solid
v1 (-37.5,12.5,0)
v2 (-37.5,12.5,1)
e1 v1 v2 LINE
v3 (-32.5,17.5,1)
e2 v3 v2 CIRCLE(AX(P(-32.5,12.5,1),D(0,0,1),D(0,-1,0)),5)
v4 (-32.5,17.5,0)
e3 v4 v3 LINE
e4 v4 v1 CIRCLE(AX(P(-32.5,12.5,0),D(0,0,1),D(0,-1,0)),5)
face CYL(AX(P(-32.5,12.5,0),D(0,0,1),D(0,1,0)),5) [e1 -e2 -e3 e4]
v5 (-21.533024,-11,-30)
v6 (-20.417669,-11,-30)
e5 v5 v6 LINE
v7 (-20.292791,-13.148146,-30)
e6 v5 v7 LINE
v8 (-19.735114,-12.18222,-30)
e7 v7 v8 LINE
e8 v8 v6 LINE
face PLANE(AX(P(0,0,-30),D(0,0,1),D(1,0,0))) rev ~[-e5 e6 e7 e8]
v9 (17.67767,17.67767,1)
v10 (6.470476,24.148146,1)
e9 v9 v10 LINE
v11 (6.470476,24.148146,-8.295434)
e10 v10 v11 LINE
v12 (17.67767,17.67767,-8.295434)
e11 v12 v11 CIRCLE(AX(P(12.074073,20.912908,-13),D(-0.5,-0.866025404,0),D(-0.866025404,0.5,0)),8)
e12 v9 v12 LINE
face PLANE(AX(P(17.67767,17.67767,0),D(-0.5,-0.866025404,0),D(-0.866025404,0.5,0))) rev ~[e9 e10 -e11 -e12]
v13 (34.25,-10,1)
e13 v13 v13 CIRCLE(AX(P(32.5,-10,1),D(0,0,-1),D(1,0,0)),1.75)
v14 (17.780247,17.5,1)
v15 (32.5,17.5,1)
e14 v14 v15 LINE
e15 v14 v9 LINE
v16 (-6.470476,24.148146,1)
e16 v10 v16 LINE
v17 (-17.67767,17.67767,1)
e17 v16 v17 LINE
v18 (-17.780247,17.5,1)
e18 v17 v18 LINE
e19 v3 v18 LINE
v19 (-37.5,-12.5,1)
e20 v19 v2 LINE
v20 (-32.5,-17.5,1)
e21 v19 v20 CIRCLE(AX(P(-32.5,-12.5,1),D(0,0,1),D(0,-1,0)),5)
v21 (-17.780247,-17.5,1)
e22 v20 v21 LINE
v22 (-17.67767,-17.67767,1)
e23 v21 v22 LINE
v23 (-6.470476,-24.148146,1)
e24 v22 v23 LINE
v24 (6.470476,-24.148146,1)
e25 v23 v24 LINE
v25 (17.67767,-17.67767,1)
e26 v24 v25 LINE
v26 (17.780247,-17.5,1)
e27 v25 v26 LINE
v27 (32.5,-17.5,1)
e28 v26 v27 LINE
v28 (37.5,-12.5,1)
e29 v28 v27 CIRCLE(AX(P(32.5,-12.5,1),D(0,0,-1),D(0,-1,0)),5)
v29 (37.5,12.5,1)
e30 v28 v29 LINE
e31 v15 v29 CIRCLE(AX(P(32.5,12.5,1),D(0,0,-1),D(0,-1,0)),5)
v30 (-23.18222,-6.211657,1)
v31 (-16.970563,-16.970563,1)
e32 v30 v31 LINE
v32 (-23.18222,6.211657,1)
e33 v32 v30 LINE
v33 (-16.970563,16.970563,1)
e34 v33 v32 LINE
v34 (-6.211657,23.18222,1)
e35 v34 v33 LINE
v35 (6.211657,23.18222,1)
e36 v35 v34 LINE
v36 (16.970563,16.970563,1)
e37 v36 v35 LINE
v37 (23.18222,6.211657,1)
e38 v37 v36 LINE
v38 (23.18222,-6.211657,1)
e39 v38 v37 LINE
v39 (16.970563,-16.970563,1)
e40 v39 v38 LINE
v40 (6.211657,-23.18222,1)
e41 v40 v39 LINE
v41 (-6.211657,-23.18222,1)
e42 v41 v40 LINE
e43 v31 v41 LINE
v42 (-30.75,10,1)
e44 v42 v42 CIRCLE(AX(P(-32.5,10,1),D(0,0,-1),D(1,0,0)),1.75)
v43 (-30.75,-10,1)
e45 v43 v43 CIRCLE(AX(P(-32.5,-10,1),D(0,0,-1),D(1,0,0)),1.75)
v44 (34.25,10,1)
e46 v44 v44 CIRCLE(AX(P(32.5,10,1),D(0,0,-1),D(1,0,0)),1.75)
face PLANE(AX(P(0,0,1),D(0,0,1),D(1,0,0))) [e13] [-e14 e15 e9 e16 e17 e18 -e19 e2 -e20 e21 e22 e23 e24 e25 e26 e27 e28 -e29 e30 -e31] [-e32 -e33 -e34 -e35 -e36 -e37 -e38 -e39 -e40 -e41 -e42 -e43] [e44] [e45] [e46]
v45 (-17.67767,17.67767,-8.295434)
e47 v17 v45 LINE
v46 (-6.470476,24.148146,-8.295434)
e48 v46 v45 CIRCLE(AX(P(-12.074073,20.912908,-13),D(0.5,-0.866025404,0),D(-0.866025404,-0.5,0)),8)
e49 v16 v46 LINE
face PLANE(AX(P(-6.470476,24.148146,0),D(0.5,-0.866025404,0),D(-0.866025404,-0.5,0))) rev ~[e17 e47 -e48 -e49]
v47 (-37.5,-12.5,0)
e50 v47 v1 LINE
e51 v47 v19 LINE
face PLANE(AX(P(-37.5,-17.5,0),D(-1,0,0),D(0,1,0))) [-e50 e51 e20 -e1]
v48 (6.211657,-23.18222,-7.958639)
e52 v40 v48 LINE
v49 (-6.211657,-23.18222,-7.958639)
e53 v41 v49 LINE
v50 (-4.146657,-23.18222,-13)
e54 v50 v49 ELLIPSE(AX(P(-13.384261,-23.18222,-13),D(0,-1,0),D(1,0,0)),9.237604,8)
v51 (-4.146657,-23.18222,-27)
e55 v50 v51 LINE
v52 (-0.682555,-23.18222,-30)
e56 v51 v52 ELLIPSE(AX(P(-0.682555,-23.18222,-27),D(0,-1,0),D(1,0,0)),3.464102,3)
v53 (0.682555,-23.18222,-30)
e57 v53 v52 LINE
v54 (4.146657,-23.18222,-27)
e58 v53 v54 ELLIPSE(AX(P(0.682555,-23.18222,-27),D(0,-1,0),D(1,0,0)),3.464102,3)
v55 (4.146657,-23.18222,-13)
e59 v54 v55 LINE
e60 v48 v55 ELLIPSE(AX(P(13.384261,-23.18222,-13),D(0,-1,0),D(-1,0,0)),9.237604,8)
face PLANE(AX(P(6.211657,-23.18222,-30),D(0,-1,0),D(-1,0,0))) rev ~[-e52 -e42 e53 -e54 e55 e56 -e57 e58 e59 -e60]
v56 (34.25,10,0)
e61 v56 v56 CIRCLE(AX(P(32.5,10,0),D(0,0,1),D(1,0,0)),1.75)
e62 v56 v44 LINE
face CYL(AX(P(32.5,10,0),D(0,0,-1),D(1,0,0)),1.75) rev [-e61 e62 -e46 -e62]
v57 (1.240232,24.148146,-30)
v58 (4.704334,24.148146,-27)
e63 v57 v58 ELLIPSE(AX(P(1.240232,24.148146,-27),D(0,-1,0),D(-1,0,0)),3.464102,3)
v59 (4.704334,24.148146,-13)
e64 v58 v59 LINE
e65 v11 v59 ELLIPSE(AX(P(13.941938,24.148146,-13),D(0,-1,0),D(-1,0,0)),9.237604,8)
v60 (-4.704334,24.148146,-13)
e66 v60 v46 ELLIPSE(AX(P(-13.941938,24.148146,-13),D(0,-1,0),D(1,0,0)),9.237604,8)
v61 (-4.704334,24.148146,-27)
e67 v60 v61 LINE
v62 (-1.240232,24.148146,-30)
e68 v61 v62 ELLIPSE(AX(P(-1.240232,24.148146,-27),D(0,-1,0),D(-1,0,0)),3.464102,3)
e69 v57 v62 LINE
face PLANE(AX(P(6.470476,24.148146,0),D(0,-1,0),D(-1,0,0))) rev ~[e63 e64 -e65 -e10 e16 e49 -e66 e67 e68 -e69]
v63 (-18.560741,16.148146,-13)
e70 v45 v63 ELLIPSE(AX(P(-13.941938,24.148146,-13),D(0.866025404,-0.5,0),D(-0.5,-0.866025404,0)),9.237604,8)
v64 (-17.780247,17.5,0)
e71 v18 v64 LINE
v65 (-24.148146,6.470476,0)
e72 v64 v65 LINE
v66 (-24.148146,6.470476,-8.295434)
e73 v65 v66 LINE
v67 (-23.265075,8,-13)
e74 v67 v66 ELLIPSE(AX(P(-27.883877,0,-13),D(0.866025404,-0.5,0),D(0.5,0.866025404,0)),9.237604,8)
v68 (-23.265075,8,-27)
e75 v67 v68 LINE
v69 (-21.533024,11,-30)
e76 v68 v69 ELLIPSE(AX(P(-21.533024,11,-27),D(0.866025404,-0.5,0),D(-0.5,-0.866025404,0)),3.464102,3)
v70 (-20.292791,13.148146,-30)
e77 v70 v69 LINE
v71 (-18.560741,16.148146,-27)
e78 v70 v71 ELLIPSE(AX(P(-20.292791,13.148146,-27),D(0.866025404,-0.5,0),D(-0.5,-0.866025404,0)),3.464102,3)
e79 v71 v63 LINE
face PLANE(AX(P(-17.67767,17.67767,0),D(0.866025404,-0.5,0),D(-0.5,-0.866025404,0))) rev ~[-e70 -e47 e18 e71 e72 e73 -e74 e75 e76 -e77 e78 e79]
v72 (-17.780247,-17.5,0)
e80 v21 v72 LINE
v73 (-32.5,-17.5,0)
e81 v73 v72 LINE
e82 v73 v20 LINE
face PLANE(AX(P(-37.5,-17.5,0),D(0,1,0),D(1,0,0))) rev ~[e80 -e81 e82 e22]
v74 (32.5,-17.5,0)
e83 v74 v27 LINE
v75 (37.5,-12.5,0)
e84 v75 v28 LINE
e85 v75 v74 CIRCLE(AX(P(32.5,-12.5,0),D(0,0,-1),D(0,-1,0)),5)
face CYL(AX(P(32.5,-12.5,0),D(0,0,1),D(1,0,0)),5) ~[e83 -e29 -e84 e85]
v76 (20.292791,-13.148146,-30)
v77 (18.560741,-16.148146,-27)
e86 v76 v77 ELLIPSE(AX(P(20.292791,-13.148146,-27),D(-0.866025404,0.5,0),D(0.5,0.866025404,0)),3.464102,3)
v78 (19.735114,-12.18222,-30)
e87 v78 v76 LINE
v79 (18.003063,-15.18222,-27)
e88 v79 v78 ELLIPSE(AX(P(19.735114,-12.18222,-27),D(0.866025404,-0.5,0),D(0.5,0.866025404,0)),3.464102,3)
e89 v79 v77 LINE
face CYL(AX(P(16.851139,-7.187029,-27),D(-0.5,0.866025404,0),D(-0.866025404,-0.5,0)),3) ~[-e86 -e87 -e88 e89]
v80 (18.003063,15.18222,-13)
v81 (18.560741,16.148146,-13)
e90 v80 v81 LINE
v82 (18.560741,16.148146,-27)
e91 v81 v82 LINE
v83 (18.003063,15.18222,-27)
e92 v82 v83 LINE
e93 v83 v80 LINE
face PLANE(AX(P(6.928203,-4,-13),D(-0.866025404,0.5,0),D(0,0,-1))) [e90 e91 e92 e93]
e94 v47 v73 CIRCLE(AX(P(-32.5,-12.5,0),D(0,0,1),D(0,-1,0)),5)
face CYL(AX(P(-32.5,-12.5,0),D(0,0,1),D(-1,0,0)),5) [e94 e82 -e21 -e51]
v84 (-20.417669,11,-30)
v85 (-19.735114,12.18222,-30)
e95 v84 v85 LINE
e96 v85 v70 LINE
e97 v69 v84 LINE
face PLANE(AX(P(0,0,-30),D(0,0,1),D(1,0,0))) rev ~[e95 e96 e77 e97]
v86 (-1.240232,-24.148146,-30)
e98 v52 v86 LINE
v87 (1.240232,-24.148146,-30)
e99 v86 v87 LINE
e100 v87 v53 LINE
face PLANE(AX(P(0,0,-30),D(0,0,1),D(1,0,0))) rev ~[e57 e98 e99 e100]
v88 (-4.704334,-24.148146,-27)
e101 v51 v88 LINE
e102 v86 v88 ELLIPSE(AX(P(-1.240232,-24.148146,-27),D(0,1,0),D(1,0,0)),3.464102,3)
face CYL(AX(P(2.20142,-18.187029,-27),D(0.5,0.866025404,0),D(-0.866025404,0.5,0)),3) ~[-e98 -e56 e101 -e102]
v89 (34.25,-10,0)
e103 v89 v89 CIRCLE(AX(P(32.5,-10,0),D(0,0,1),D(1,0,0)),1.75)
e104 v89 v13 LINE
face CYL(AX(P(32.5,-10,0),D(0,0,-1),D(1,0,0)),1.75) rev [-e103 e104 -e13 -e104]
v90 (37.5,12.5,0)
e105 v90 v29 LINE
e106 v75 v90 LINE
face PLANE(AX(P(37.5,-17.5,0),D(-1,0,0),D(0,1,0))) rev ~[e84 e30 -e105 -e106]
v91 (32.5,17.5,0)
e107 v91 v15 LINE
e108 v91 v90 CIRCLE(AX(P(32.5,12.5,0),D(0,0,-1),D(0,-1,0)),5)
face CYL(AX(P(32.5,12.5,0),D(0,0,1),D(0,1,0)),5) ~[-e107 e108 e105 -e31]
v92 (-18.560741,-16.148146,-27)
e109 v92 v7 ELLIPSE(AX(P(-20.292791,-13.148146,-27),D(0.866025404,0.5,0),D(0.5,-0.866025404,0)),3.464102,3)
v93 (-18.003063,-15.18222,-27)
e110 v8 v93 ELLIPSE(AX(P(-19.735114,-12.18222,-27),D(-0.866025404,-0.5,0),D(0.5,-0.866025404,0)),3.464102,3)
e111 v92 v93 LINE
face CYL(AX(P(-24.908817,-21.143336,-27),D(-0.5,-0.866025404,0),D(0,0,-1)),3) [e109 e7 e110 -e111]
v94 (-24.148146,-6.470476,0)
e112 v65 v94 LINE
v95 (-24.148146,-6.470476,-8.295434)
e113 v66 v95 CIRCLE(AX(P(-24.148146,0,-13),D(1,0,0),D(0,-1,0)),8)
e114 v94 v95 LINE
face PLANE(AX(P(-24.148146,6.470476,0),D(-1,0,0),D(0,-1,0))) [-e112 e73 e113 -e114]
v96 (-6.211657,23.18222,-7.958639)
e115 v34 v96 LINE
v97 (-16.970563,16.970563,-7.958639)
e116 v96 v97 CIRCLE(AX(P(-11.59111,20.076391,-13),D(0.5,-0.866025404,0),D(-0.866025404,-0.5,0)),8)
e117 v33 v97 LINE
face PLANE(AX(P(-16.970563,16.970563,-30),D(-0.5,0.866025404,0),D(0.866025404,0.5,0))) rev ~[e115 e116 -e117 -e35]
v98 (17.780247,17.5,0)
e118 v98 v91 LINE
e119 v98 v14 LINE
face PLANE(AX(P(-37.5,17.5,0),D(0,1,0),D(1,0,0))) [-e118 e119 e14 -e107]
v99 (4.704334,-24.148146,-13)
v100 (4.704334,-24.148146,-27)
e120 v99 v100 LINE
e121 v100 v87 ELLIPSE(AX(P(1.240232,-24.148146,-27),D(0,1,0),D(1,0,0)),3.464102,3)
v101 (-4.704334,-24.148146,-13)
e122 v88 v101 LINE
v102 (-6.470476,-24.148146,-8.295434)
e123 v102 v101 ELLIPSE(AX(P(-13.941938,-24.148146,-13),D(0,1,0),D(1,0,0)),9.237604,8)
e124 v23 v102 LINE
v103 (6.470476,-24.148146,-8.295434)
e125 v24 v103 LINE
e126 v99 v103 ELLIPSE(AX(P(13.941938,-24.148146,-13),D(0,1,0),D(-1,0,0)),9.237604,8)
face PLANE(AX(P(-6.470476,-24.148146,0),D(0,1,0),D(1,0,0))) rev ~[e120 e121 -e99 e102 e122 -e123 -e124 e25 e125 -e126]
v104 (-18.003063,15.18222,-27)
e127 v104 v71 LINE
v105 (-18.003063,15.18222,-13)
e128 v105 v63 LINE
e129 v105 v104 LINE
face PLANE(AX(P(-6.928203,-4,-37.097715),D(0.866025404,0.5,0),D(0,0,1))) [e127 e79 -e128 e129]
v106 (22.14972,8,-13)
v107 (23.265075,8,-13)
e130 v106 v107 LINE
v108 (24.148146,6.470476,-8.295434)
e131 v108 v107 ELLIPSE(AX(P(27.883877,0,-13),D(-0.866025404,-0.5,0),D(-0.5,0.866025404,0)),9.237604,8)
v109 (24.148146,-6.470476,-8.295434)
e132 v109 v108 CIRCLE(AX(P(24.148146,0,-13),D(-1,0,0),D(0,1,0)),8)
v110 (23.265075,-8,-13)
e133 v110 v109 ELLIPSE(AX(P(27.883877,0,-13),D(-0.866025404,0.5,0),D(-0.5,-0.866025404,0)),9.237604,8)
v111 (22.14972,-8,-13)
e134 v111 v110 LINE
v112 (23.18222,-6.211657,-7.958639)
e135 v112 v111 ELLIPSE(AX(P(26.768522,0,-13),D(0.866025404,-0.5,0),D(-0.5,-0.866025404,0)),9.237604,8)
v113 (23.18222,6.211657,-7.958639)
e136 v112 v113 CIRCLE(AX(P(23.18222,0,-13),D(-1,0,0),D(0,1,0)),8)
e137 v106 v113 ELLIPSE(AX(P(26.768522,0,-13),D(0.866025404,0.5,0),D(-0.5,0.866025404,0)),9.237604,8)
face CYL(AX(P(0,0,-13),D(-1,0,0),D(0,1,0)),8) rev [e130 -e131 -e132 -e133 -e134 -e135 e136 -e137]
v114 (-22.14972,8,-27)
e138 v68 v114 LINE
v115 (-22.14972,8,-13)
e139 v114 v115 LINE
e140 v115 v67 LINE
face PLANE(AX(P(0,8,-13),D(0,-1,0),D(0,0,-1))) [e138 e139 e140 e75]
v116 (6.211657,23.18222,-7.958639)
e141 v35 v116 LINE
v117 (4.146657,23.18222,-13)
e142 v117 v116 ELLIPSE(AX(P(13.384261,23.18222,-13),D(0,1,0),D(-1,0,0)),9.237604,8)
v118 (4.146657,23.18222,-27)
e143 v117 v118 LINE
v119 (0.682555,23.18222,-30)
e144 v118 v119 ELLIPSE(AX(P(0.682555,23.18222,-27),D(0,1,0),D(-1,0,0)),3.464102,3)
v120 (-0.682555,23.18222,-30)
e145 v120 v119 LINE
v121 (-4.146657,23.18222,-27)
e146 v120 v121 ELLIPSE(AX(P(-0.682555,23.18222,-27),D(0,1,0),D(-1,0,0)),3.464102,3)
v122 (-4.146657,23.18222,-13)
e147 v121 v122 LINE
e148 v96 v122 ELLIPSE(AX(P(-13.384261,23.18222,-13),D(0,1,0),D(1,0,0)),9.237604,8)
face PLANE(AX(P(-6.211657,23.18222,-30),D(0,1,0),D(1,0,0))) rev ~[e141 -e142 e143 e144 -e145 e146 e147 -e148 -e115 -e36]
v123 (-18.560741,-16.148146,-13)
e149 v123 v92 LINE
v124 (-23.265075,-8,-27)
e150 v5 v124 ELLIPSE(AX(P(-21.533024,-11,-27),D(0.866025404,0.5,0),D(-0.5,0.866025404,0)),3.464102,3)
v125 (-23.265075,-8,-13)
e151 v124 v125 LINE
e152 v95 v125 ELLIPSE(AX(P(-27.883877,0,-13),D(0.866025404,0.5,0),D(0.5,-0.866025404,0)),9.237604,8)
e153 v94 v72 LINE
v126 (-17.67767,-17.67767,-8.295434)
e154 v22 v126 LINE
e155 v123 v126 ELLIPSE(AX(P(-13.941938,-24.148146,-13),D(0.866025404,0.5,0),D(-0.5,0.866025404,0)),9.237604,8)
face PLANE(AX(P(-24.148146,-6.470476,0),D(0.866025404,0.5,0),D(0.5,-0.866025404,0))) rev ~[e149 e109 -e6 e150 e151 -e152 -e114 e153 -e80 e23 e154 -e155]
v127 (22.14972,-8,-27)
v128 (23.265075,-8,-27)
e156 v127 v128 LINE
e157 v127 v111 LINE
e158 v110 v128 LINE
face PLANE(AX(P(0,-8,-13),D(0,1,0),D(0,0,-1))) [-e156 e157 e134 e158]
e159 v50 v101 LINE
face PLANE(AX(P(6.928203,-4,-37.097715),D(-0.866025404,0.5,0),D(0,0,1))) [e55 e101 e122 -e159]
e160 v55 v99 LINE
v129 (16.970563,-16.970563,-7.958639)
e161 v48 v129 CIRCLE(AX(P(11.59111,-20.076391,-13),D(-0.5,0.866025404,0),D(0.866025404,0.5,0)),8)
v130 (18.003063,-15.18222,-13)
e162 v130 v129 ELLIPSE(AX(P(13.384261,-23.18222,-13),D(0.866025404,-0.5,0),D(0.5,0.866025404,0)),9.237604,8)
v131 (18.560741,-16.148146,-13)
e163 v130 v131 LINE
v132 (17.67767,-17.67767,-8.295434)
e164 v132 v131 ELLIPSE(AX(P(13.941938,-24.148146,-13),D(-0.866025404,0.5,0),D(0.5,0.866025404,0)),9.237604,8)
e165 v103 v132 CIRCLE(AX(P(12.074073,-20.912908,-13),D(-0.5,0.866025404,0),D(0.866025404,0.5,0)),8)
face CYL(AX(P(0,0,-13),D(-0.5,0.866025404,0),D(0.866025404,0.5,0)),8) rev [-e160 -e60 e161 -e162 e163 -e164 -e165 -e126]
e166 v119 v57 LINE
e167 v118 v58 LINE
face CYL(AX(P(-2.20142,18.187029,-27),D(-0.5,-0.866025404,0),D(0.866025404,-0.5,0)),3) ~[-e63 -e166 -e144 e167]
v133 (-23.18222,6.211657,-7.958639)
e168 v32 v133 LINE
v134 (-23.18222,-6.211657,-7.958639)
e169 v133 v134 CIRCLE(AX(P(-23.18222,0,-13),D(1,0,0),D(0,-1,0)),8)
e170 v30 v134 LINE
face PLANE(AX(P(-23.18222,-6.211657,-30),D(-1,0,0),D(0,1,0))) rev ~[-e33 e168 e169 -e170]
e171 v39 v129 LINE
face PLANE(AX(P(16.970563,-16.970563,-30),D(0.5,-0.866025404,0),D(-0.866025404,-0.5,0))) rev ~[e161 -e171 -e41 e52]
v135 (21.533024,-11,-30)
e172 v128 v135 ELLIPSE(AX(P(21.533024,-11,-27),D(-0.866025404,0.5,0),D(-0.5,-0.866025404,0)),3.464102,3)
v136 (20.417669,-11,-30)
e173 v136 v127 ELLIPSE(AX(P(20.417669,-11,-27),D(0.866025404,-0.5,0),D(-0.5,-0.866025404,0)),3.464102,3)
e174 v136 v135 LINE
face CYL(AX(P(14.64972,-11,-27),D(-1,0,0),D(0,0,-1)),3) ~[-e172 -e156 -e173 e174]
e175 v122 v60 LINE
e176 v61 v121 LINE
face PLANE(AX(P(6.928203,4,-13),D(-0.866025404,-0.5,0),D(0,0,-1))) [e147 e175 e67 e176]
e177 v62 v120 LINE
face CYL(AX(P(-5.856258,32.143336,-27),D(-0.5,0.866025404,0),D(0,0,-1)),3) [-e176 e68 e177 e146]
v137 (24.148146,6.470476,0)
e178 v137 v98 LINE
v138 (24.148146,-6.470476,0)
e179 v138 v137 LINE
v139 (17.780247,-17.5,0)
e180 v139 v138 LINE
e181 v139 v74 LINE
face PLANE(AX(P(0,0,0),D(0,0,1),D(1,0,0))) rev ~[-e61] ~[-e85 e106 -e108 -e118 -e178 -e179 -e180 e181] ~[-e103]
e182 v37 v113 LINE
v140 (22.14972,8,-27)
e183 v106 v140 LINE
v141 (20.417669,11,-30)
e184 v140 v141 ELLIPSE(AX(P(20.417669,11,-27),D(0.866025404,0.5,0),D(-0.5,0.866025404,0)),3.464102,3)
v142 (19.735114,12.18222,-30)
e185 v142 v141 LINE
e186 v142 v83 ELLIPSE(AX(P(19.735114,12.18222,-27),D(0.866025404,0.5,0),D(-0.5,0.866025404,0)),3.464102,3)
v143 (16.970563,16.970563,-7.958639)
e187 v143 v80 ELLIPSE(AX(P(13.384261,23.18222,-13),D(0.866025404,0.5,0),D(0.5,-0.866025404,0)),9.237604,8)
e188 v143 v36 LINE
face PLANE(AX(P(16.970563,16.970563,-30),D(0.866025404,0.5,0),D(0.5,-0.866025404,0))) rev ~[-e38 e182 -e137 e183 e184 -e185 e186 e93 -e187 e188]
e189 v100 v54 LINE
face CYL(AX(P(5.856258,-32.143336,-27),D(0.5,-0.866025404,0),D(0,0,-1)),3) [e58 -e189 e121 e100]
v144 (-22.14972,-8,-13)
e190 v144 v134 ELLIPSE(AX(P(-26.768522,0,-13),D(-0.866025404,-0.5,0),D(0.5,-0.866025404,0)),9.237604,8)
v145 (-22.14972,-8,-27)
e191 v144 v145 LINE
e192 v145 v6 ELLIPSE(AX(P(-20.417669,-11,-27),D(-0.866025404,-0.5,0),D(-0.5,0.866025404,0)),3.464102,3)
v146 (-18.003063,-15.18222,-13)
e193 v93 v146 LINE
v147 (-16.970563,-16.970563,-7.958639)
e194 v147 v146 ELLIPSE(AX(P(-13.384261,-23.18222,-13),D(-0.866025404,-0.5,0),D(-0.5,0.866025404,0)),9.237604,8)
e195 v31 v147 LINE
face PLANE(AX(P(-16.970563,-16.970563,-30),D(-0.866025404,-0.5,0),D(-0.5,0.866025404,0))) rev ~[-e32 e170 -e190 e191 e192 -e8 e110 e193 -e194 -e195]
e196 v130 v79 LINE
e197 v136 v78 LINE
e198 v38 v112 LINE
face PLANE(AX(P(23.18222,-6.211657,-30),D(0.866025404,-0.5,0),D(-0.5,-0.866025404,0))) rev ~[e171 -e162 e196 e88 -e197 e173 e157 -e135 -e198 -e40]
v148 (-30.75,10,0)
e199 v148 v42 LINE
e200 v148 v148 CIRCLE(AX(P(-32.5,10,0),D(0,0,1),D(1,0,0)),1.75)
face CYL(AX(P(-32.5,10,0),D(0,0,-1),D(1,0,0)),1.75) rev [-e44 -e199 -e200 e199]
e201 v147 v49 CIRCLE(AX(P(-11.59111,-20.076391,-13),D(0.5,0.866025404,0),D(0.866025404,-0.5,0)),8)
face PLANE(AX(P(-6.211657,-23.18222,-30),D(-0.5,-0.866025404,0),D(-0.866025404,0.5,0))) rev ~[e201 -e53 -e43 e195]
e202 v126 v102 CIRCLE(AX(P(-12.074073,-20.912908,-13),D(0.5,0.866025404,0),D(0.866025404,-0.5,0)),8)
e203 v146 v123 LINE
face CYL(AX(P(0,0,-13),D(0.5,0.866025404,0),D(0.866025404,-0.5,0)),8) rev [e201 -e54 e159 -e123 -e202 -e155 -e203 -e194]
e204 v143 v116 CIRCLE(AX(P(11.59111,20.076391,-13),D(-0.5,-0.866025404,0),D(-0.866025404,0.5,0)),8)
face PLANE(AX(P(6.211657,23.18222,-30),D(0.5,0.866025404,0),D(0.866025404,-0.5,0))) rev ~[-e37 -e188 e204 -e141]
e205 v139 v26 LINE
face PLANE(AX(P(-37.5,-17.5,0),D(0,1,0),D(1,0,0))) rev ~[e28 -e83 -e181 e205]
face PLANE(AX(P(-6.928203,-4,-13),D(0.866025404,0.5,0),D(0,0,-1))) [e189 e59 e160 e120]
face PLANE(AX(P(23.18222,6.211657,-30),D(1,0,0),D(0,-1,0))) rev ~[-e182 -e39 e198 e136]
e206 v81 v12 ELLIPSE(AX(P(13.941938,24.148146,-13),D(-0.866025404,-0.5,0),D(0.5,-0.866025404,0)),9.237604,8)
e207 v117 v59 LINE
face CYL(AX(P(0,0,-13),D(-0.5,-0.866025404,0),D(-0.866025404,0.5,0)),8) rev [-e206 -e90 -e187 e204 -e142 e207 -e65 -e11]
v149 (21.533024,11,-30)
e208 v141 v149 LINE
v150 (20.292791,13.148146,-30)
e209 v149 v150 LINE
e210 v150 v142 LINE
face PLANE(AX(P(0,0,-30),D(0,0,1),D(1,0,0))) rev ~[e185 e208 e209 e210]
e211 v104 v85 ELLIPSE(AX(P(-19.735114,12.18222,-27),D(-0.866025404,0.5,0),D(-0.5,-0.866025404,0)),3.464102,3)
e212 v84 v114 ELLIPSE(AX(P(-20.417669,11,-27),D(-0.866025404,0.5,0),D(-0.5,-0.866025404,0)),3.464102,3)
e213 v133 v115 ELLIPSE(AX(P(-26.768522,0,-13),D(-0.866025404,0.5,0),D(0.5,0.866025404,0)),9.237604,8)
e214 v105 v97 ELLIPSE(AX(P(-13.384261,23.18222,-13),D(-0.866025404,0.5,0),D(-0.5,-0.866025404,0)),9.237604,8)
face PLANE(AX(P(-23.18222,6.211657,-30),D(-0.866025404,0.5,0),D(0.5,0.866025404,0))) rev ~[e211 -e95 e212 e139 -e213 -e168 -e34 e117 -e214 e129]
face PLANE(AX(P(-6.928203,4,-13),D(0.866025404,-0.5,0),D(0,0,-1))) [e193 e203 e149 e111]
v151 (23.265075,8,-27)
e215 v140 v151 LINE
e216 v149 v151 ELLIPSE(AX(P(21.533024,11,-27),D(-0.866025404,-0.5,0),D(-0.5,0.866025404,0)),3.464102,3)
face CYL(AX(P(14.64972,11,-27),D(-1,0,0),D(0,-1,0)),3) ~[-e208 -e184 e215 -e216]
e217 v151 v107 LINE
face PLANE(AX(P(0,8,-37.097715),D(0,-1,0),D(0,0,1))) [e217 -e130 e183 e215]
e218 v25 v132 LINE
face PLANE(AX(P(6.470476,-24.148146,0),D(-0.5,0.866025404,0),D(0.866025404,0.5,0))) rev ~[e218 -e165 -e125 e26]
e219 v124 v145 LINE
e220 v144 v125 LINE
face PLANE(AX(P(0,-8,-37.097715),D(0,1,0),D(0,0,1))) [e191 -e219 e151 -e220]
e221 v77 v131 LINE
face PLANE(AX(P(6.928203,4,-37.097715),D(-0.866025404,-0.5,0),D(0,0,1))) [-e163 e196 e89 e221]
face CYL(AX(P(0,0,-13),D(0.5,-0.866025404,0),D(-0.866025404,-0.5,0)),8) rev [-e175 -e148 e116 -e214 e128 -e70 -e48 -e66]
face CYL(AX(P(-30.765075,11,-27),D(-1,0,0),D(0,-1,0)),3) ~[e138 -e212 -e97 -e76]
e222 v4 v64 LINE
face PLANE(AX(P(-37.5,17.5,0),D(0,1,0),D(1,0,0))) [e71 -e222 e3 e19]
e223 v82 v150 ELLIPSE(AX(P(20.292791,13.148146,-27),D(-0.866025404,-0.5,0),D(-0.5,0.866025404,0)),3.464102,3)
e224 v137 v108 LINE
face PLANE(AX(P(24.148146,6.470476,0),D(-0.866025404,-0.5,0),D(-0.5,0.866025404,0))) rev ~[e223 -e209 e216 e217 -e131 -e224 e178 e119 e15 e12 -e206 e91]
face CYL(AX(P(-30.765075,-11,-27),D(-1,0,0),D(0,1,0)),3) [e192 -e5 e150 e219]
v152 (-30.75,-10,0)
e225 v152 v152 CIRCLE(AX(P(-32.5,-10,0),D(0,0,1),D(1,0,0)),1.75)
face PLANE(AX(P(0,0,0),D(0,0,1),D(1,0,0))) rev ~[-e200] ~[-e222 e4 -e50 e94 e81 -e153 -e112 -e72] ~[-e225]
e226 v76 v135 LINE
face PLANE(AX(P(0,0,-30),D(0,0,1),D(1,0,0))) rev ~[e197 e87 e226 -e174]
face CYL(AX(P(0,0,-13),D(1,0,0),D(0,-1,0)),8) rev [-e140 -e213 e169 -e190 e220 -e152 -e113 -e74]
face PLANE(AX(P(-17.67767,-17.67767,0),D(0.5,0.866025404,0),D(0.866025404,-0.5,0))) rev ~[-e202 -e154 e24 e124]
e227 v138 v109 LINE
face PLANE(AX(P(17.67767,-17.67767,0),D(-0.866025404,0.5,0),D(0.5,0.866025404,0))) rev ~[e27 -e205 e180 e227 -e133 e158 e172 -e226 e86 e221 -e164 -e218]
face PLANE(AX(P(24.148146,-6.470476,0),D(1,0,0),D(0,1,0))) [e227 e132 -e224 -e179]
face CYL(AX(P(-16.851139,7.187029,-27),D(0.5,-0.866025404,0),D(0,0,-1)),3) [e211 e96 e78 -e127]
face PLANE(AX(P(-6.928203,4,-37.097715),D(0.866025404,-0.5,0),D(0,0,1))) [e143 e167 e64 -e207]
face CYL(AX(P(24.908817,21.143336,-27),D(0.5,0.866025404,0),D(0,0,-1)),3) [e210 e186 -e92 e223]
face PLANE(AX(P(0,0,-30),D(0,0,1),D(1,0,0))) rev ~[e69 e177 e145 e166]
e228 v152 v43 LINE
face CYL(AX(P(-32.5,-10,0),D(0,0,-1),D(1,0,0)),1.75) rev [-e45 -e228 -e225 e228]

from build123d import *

# Parameters (mm, degrees)
F0_W             = 75
F0_H             = 35
F1_DEPTH         = 1
F3_DEPTH         = 30
F5_DEPTH         = 35
F6_R             = 5
F7_R             = 1.75
F8_DEPTH         = 25
F9_DEPTH         = 1
F10_DEPTH        = 65.4
F13_DEPTH        = 35.6
F13_COPIES_COUNT = 6
F14_T1_DEPTH     = 16.1153550717
F14_T3_DEPTH     = 16.1153550717
F14_T5_DEPTH     = 16.1153550717
F14_T7_DEPTH     = 16.1153550717
F14_T9_DEPTH     = 16.1153550717
F14_T11_DEPTH    = 16.1153550717
F14_T13_DEPTH    = 16.1153550717
F14_T15_DEPTH    = 16.1153550717
F14_T17_DEPTH    = 16.1153550717
F14_T19_DEPTH    = 16.1153550717


# Not quite as in the source:
# - a fillet or chamfer that OpenCascade refuses, or shapes differently, is made with other operations: its cross-section is extruded or revolved along the edge and cut away or added
# - a pattern or mirror of a feature is missing from the dataset's text; its kind, count and spacing are read off the source's solid


with BuildPart() as f1:
    # F0 (on Top) → F1 (new body)
    with BuildSketch(Plane.XY):
        Rectangle(F0_W, F0_H)
    extrude(amount=F1_DEPTH)

    # F2 (on Top) → F3 (join)
    with BuildSketch(Plane.XY):
        Polygon((24.1481456572, 6.4704761276), (17.6776695297, 17.6776695297), (6.4704761276, 24.1481456572), (-6.4704761276, 24.1481456572), (-17.6776695297, 17.6776695297), (-24.1481456572, 6.4704761276), (-24.1481456572, -6.4704761276), (-17.6776695297, -17.6776695297), (-6.4704761276, -24.1481456572), (6.4704761276, -24.1481456572), (17.6776695297, -17.6776695297), (24.1481456572, -6.4704761276), align=None)
    extrude(amount=-F3_DEPTH)

    # F4 (on face) → F5 (cut)
    with BuildSketch(Plane(origin=(0, 0, -30), x_dir=(1, 0, 0), z_dir=(0, 0, -1))):
        Polygon((6.2116570825, -23.1822198309), (16.9705627485, -16.9705627485), (23.1822198309, -6.2116570825), (23.1822198309, 6.2116570825), (16.9705627485, 16.9705627485), (6.2116570825, 23.1822198309), (-6.2116570825, 23.1822198309), (-16.9705627485, 16.9705627485), (-23.1822198309, 6.2116570825), (-23.1822198309, -6.2116570825), (-16.9705627485, -16.9705627485), (-6.2116570825, -23.1822198309), align=None)
    extrude(amount=-F5_DEPTH, mode=Mode.SUBTRACT)

    # F6
    f6_edges = [f1.edges().sort_by_distance(p)[0] for p in [
        (37.5, -17.5, 0.5),
        (37.5, 17.5, 0.5),
        (-37.5, -17.5, 0.5),
        (-37.5, 17.5, 0.5),
    ]]
    fillet(f6_edges, radius=F6_R)

    # F7 (on Top) → F8 (cut)
    with BuildSketch(Plane.XY):
        with Locations((-32.5, 10)):
            Circle(F7_R)
        with Locations((-32.5, -10)):
            Circle(F7_R)
        with Locations((32.5, -10)):
            Circle(F7_R)
        with Locations((32.5, 10)):
            Circle(F7_R)
    extrude(amount=F8_DEPTH, mode=Mode.SUBTRACT)

    # F2 (on Top) → F9 (join)
    with BuildSketch(Plane.XY):
        Polygon((24.1481456572, 6.4704761276), (17.6776695297, 17.6776695297), (6.4704761276, 24.1481456572), (-6.4704761276, 24.1481456572), (-17.6776695297, 17.6776695297), (-24.1481456572, 6.4704761276), (-24.1481456572, -6.4704761276), (-17.6776695297, -17.6776695297), (-6.4704761276, -24.1481456572), (6.4704761276, -24.1481456572), (17.6776695297, -17.6776695297), (24.1481456572, -6.4704761276), align=None)
    extrude(amount=F9_DEPTH)

    # F4 (on face) → F10 (cut)
    with BuildSketch(Plane(origin=(0, 0, -30), x_dir=(1, 0, 0), z_dir=(0, 0, -1))):
        Polygon((6.2116570825, -23.1822198309), (16.9705627485, -16.9705627485), (23.1822198309, -6.2116570825), (23.1822198309, 6.2116570825), (16.9705627485, 16.9705627485), (6.2116570825, 23.1822198309), (-6.2116570825, 23.1822198309), (-16.9705627485, 16.9705627485), (-23.1822198309, 6.2116570825), (-23.1822198309, -6.2116570825), (-16.9705627485, -16.9705627485), (-6.2116570825, -23.1822198309), align=None)
    extrude(amount=-F10_DEPTH, mode=Mode.SUBTRACT)

    # F12 (on Right) → F13 (cut)
    with BuildSketch(Plane.YZ):
        with BuildLine():
            ThreePointArc((-8, -13), (0, -21), (8, -13))
            ThreePointArc((8, -13), (0, -5), (-8, -13))
        make_face()
        with BuildLine():
            Line((8, -37.0977148414), (8, -13))
            ThreePointArc((8, -13), (0, -21), (-8, -13))
            Line((-8, -13), (-8, -36.2910553813))
            Line((-8, -36.2910553813), (8, -37.0977148414))
        make_face()
    f13 = extrude(amount=F13_DEPTH, mode=Mode.SUBTRACT)

    # F13_copies: F13 ×6 about axis
    f13_copies_axis = Axis((0, 0, 0), (0, 0, 1))
    for i in range(1, F13_COPIES_COUNT):
        add(f13.rotate(f13_copies_axis, i * 360 / F13_COPIES_COUNT), mode=Mode.SUBTRACT)

    # F14: fillet of radius 3 on 12 edges, made by hand

    # F14_s2 → F14_t1 (cut)
    with BuildSketch(Plane.YZ.offset(14.6497195661)):
        with BuildLine():
            ThreePointArc((-11, -30), (-8.8786796564, -29.1213203436), (-8, -27))
            Line((-8, -27), (-8, -30))
            Line((-8, -30), (-11, -30))
        make_face()
        with BuildLine():
            ThreePointArc((8, -27), (8.8786796564, -29.1213203436), (11, -30))
            Line((11, -30), (8, -30))
            Line((8, -30), (8, -27))
        make_face()
    extrude(amount=F14_T1_DEPTH, mode=Mode.SUBTRACT)

    # F14_s4 → F14_t3 (cut)
    with BuildSketch(Plane.YZ.offset(-30.7650746377)):
        with BuildLine():
            ThreePointArc((-8, -27), (-8.8786796564, -29.1213203436), (-11, -30))
            Line((-11, -30), (-8, -30))
            Line((-8, -30), (-8, -27))
        make_face()
        with BuildLine():
            ThreePointArc((8, -27), (8.8786796564, -29.1213203436), (11, -30))
            Line((11, -30), (8, -30))
            Line((8, -30), (8, -27))
        make_face()
    extrude(amount=F14_T3_DEPTH, mode=Mode.SUBTRACT)

    # F14_s6 → F14_t5 (cut)
    with BuildSketch(Plane(origin=(-15.3825373189, -26.6433361856, 0), x_dir=(0, 0, 1), z_dir=(0.5, 0.8660254038, 0))):
        with BuildLine():
            ThreePointArc((-30, -11), (-29.1213203436, -8.8786796564), (-27, -8))
            Line((-27, -8), (-30, -8))
            Line((-30, -8), (-30, -11))
        make_face()
    extrude(amount=F14_T5_DEPTH, mode=Mode.SUBTRACT)

    # F14_s8 → F14_t7 (cut)
    with BuildSketch(Plane(origin=(-7.324859783, 12.6870293026, 0), x_dir=(0, 0, 1), z_dir=(-0.5, 0.8660254038, 0))):
        with BuildLine():
            ThreePointArc((-30, -11), (-29.1213203436, -8.8786796564), (-27, -8))
            Line((-27, -8), (-30, -8))
            Line((-30, -8), (-30, -11))
        make_face()
    extrude(amount=F14_T7_DEPTH, mode=Mode.SUBTRACT)

    # F14_s10 → F14_t9 (cut)
    with BuildSketch(Plane(origin=(-7.324859783, -12.6870293026, 0), x_dir=(0, 0, 1), z_dir=(-0.5, -0.8660254038, 0))):
        with BuildLine():
            ThreePointArc((-27, -8), (-29.1213203436, -8.8786796564), (-30, -11))
            Line((-30, -11), (-30, -8))
            Line((-30, -8), (-27, -8))
        make_face()
    extrude(amount=F14_T9_DEPTH, mode=Mode.SUBTRACT)

    # F14_s12 → F14_t11 (cut)
    with BuildSketch(Plane(origin=(7.324859783, 12.6870293026, 0), x_dir=(0, 0, 1), z_dir=(0.5, 0.8660254038, 0))):
        with BuildLine():
            ThreePointArc((-27, -8), (-29.1213203436, -8.8786796564), (-30, -11))
            Line((-30, -11), (-30, -8))
            Line((-30, -8), (-27, -8))
        make_face()
    extrude(amount=F14_T11_DEPTH, mode=Mode.SUBTRACT)

    # F14_s14 → F14_t13 (cut)
    with BuildSketch(Plane(origin=(-15.3825373189, 26.6433361856, 0), x_dir=(0, 0, 1), z_dir=(0.5, -0.8660254038, 0))):
        with BuildLine():
            ThreePointArc((-30, -11), (-29.1213203436, -8.8786796564), (-27, -8))
            Line((-27, -8), (-30, -8))
            Line((-30, -8), (-30, -11))
        make_face()
    extrude(amount=F14_T13_DEPTH, mode=Mode.SUBTRACT)

    # F14_s16 → F14_t15 (cut)
    with BuildSketch(Plane(origin=(15.3825373189, -26.6433361856, 0), x_dir=(0, 0, 1), z_dir=(-0.5, 0.8660254038, 0))):
        with BuildLine():
            ThreePointArc((-30, -11), (-29.1213203436, -8.8786796564), (-27, -8))
            Line((-27, -8), (-30, -8))
            Line((-30, -8), (-30, -11))
        make_face()
    extrude(amount=F14_T15_DEPTH, mode=Mode.SUBTRACT)

    # F14_s18 → F14_t17 (cut)
    with BuildSketch(Plane(origin=(15.3825373189, 26.6433361856, 0), x_dir=(0, 0, 1), z_dir=(-0.5, -0.8660254038, 0))):
        with BuildLine():
            ThreePointArc((-30, -11), (-29.1213203436, -8.8786796564), (-27, -8))
            Line((-27, -8), (-30, -8))
            Line((-30, -8), (-30, -11))
        make_face()
    extrude(amount=F14_T17_DEPTH, mode=Mode.SUBTRACT)

    # F14_s20 → F14_t19 (cut)
    with BuildSketch(Plane(origin=(7.324859783, -12.6870293026, 0), x_dir=(0, 0, 1), z_dir=(0.5, -0.8660254038, 0))):
        with BuildLine():
            ThreePointArc((-27, -8), (-29.1213203436, -8.8786796564), (-30, -11))
            Line((-30, -11), (-30, -8))
            Line((-30, -8), (-27, -8))
        make_face()
    extrude(amount=F14_T19_DEPTH, mode=Mode.SUBTRACT)


solid = f1.part
